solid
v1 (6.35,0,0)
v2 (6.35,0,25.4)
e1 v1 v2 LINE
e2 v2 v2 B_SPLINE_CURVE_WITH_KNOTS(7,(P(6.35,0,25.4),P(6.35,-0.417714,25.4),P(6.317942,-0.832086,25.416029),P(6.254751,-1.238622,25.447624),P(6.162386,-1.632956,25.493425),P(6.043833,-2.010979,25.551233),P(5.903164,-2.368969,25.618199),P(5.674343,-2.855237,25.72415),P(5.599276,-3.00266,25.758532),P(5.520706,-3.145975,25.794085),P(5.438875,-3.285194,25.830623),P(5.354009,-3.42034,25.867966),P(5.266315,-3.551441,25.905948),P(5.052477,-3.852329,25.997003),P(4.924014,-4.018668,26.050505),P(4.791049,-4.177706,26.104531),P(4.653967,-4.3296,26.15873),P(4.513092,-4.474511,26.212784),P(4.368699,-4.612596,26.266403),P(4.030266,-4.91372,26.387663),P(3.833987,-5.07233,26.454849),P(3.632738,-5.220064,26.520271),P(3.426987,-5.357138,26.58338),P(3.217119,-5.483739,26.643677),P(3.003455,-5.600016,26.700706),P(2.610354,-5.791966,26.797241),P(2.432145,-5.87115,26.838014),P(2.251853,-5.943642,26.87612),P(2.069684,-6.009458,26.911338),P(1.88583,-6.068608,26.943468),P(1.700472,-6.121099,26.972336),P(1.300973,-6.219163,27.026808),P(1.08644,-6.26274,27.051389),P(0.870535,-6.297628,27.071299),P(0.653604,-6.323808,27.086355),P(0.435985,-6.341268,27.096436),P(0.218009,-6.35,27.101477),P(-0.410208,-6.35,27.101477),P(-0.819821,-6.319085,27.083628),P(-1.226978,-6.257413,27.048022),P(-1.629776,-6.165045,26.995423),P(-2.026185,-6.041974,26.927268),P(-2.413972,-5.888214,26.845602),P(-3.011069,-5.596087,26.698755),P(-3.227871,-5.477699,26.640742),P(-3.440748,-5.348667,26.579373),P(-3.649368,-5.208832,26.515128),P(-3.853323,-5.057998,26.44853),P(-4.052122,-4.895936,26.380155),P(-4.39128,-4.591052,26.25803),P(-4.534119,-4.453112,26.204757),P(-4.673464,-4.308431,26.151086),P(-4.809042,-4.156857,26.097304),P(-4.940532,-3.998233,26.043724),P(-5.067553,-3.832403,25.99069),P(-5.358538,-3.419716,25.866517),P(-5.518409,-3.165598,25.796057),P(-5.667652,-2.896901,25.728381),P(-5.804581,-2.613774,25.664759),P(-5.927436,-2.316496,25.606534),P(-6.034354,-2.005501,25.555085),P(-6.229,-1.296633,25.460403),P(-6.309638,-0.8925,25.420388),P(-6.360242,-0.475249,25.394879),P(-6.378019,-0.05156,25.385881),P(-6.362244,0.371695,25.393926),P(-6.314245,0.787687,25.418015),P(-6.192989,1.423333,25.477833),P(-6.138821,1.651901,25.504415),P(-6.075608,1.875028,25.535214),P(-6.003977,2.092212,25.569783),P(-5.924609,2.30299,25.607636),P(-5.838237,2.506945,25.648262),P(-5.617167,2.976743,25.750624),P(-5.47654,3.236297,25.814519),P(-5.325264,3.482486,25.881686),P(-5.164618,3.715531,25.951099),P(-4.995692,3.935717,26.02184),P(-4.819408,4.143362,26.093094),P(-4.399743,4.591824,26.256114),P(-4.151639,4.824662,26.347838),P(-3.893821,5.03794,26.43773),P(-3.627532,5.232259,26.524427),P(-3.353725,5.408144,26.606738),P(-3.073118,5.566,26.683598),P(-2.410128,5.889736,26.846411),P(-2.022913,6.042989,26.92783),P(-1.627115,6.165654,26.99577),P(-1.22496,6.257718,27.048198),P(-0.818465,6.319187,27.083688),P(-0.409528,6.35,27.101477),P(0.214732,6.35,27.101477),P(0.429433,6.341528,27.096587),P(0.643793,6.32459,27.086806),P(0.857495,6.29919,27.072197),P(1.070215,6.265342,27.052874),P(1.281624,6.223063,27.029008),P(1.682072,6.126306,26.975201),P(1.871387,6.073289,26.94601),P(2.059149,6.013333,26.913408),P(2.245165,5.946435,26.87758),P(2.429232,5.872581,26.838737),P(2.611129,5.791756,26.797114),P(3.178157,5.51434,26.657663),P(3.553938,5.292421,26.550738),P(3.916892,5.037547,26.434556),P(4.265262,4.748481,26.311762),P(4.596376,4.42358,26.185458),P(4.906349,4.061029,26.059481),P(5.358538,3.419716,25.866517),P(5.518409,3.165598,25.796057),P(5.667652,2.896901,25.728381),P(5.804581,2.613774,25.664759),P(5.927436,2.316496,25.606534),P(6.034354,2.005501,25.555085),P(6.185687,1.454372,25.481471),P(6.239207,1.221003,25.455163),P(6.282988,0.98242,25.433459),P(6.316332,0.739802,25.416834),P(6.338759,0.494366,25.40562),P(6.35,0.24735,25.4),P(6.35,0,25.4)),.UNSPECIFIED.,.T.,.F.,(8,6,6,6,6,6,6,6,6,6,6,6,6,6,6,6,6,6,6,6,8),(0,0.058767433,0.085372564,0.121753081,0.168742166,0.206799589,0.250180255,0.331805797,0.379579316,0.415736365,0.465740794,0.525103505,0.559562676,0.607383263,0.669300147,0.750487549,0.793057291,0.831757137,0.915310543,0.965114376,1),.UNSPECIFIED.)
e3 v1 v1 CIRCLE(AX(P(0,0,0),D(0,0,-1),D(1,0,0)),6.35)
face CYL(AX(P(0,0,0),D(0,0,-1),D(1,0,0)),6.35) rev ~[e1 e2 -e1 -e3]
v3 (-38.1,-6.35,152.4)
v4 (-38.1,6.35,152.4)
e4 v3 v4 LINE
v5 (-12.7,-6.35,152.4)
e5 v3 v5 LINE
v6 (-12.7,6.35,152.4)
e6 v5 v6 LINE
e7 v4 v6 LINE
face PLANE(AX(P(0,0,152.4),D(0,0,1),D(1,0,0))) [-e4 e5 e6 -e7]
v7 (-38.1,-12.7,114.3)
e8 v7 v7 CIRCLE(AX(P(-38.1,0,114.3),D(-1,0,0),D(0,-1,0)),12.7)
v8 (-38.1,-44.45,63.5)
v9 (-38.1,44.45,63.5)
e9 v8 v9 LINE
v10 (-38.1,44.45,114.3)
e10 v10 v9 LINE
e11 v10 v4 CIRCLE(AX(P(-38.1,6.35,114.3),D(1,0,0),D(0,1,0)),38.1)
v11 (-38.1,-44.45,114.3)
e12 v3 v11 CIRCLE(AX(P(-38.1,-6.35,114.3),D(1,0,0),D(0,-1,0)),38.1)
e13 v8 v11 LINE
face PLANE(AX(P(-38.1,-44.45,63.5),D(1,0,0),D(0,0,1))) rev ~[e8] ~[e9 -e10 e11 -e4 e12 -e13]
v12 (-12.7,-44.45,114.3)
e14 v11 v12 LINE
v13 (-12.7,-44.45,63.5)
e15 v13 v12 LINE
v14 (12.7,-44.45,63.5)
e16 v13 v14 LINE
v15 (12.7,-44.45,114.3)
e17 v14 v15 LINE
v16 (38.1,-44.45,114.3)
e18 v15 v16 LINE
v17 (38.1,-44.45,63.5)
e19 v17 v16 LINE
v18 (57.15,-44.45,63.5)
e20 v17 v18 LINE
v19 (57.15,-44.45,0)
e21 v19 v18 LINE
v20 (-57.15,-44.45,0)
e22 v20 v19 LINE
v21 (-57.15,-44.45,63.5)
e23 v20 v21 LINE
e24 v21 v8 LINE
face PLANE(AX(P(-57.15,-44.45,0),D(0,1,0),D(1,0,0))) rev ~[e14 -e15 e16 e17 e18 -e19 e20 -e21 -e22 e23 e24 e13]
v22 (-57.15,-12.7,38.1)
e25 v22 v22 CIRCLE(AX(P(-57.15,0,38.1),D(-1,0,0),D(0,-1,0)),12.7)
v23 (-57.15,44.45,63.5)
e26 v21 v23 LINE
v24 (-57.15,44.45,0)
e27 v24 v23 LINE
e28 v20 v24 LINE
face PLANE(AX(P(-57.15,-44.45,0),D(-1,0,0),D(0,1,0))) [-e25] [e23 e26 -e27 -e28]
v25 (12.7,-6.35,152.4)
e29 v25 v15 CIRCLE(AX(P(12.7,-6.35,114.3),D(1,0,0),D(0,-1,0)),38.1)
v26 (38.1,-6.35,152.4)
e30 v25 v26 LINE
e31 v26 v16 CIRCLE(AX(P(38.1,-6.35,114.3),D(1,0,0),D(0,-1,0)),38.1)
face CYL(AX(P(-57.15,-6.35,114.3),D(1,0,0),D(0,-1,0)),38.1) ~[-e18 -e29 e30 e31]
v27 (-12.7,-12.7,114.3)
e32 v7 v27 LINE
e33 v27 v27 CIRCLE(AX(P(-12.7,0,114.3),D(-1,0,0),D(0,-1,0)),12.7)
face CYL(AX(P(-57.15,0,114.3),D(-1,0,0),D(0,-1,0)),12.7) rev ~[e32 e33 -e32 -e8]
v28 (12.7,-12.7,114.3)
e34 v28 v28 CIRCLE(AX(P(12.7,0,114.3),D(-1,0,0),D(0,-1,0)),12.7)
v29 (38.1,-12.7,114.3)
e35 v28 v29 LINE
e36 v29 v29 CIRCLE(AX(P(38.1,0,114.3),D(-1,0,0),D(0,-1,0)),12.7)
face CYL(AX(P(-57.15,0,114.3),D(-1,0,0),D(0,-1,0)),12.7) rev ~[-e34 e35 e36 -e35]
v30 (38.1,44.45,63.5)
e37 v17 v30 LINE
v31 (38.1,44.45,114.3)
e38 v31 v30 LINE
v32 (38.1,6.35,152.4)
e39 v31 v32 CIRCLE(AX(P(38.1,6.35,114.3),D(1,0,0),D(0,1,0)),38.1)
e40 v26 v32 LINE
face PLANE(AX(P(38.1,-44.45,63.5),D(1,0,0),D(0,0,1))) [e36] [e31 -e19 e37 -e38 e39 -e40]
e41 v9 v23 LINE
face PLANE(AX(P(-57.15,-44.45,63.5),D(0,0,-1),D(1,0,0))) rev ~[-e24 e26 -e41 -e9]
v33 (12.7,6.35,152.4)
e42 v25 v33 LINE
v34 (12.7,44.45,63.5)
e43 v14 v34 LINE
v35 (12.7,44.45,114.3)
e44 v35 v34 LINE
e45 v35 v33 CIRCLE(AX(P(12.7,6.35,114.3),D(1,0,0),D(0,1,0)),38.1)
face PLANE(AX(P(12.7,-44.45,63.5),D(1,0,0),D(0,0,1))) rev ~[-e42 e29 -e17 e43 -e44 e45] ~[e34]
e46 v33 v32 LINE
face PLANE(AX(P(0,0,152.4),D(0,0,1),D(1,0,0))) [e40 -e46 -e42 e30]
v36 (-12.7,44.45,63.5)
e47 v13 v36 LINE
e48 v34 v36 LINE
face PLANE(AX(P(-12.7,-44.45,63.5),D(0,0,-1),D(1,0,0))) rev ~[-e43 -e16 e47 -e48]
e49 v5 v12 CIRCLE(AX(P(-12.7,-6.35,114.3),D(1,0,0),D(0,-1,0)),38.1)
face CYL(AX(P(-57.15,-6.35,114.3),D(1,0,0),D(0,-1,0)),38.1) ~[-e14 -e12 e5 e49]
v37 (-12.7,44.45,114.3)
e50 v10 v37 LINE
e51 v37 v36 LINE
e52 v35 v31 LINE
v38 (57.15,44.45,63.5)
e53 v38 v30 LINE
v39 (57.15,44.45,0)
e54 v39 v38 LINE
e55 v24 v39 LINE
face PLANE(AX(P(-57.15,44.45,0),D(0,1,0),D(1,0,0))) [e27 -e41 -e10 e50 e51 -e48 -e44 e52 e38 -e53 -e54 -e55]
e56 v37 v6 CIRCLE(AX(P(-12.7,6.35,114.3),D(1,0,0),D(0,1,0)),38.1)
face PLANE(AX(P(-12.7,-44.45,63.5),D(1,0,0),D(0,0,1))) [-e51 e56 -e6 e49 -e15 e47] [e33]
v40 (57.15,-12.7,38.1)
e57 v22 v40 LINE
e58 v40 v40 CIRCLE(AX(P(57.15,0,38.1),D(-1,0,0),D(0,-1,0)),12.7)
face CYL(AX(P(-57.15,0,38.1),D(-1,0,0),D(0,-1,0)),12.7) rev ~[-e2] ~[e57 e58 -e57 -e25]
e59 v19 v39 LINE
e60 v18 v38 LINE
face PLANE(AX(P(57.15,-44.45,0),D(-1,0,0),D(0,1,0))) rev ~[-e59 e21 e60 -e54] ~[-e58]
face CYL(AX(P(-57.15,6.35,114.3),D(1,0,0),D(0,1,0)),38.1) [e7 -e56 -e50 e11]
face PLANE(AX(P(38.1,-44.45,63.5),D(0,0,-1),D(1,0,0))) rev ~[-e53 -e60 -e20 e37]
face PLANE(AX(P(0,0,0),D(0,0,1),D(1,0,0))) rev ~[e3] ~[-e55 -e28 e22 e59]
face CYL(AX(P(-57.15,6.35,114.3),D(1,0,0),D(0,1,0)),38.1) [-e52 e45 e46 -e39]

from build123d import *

# Parameters (mm, degrees)
F0_W     = 114.3
F0_H     = 88.9
F1_DEPTH = 152.4
F3_R     = 38.1
F4_R     = 12.7
F5_DEPTH = 114.301
F6_R     = 6.35
F7_DEPTH = 38.1
F2_W     = 19.05
F2_H     = 88.9
F2_W_2   = 25.4
F8_DEPTH = 88.901


with BuildPart() as f1:
    # F0 (on Top) → F1 (new body)
    with BuildSketch(Plane.XY):
        Rectangle(F0_W, F0_H)
    extrude(amount=F1_DEPTH)

    # F3
    f3_edges = [f1.edges().sort_by_distance(p)[0] for p in [
        (0, -44.45, 152.4),
        (0, 44.45, 152.4),
    ]]
    fillet(f3_edges, radius=F3_R)

    # F4 (on face) → F5 (cut, through all)
    with BuildSketch(Plane(origin=(-57.15, 0, 0), x_dir=(0, -1, 0), z_dir=(-1, 0, 0))):
        with Locations((0, 38.1)):
            Circle(F4_R)
        with Locations((0, 114.3)):
            Circle(F4_R)
    extrude(amount=-F5_DEPTH, mode=Mode.SUBTRACT)

    # F6 (on face) → F7 (cut)
    with BuildSketch(Plane(origin=(0, 0, 0), x_dir=(1, 0, 0), z_dir=(0, 0, -1))):
        Circle(F6_R)
    extrude(amount=-F7_DEPTH, mode=Mode.SUBTRACT)

    # F2 (on face) → F8 (cut, through all)
    with BuildSketch(Plane.XZ.offset(44.45)):
        with Locations((-47.625, 107.95)):
            Rectangle(F2_W, F2_H)
        with Locations((0, 107.95)):
            Rectangle(F2_W_2, F2_H)
        with Locations((47.625, 107.95)):
            Rectangle(F2_W, F2_H)
    extrude(amount=-F8_DEPTH, mode=Mode.SUBTRACT)


solid = f1.part
